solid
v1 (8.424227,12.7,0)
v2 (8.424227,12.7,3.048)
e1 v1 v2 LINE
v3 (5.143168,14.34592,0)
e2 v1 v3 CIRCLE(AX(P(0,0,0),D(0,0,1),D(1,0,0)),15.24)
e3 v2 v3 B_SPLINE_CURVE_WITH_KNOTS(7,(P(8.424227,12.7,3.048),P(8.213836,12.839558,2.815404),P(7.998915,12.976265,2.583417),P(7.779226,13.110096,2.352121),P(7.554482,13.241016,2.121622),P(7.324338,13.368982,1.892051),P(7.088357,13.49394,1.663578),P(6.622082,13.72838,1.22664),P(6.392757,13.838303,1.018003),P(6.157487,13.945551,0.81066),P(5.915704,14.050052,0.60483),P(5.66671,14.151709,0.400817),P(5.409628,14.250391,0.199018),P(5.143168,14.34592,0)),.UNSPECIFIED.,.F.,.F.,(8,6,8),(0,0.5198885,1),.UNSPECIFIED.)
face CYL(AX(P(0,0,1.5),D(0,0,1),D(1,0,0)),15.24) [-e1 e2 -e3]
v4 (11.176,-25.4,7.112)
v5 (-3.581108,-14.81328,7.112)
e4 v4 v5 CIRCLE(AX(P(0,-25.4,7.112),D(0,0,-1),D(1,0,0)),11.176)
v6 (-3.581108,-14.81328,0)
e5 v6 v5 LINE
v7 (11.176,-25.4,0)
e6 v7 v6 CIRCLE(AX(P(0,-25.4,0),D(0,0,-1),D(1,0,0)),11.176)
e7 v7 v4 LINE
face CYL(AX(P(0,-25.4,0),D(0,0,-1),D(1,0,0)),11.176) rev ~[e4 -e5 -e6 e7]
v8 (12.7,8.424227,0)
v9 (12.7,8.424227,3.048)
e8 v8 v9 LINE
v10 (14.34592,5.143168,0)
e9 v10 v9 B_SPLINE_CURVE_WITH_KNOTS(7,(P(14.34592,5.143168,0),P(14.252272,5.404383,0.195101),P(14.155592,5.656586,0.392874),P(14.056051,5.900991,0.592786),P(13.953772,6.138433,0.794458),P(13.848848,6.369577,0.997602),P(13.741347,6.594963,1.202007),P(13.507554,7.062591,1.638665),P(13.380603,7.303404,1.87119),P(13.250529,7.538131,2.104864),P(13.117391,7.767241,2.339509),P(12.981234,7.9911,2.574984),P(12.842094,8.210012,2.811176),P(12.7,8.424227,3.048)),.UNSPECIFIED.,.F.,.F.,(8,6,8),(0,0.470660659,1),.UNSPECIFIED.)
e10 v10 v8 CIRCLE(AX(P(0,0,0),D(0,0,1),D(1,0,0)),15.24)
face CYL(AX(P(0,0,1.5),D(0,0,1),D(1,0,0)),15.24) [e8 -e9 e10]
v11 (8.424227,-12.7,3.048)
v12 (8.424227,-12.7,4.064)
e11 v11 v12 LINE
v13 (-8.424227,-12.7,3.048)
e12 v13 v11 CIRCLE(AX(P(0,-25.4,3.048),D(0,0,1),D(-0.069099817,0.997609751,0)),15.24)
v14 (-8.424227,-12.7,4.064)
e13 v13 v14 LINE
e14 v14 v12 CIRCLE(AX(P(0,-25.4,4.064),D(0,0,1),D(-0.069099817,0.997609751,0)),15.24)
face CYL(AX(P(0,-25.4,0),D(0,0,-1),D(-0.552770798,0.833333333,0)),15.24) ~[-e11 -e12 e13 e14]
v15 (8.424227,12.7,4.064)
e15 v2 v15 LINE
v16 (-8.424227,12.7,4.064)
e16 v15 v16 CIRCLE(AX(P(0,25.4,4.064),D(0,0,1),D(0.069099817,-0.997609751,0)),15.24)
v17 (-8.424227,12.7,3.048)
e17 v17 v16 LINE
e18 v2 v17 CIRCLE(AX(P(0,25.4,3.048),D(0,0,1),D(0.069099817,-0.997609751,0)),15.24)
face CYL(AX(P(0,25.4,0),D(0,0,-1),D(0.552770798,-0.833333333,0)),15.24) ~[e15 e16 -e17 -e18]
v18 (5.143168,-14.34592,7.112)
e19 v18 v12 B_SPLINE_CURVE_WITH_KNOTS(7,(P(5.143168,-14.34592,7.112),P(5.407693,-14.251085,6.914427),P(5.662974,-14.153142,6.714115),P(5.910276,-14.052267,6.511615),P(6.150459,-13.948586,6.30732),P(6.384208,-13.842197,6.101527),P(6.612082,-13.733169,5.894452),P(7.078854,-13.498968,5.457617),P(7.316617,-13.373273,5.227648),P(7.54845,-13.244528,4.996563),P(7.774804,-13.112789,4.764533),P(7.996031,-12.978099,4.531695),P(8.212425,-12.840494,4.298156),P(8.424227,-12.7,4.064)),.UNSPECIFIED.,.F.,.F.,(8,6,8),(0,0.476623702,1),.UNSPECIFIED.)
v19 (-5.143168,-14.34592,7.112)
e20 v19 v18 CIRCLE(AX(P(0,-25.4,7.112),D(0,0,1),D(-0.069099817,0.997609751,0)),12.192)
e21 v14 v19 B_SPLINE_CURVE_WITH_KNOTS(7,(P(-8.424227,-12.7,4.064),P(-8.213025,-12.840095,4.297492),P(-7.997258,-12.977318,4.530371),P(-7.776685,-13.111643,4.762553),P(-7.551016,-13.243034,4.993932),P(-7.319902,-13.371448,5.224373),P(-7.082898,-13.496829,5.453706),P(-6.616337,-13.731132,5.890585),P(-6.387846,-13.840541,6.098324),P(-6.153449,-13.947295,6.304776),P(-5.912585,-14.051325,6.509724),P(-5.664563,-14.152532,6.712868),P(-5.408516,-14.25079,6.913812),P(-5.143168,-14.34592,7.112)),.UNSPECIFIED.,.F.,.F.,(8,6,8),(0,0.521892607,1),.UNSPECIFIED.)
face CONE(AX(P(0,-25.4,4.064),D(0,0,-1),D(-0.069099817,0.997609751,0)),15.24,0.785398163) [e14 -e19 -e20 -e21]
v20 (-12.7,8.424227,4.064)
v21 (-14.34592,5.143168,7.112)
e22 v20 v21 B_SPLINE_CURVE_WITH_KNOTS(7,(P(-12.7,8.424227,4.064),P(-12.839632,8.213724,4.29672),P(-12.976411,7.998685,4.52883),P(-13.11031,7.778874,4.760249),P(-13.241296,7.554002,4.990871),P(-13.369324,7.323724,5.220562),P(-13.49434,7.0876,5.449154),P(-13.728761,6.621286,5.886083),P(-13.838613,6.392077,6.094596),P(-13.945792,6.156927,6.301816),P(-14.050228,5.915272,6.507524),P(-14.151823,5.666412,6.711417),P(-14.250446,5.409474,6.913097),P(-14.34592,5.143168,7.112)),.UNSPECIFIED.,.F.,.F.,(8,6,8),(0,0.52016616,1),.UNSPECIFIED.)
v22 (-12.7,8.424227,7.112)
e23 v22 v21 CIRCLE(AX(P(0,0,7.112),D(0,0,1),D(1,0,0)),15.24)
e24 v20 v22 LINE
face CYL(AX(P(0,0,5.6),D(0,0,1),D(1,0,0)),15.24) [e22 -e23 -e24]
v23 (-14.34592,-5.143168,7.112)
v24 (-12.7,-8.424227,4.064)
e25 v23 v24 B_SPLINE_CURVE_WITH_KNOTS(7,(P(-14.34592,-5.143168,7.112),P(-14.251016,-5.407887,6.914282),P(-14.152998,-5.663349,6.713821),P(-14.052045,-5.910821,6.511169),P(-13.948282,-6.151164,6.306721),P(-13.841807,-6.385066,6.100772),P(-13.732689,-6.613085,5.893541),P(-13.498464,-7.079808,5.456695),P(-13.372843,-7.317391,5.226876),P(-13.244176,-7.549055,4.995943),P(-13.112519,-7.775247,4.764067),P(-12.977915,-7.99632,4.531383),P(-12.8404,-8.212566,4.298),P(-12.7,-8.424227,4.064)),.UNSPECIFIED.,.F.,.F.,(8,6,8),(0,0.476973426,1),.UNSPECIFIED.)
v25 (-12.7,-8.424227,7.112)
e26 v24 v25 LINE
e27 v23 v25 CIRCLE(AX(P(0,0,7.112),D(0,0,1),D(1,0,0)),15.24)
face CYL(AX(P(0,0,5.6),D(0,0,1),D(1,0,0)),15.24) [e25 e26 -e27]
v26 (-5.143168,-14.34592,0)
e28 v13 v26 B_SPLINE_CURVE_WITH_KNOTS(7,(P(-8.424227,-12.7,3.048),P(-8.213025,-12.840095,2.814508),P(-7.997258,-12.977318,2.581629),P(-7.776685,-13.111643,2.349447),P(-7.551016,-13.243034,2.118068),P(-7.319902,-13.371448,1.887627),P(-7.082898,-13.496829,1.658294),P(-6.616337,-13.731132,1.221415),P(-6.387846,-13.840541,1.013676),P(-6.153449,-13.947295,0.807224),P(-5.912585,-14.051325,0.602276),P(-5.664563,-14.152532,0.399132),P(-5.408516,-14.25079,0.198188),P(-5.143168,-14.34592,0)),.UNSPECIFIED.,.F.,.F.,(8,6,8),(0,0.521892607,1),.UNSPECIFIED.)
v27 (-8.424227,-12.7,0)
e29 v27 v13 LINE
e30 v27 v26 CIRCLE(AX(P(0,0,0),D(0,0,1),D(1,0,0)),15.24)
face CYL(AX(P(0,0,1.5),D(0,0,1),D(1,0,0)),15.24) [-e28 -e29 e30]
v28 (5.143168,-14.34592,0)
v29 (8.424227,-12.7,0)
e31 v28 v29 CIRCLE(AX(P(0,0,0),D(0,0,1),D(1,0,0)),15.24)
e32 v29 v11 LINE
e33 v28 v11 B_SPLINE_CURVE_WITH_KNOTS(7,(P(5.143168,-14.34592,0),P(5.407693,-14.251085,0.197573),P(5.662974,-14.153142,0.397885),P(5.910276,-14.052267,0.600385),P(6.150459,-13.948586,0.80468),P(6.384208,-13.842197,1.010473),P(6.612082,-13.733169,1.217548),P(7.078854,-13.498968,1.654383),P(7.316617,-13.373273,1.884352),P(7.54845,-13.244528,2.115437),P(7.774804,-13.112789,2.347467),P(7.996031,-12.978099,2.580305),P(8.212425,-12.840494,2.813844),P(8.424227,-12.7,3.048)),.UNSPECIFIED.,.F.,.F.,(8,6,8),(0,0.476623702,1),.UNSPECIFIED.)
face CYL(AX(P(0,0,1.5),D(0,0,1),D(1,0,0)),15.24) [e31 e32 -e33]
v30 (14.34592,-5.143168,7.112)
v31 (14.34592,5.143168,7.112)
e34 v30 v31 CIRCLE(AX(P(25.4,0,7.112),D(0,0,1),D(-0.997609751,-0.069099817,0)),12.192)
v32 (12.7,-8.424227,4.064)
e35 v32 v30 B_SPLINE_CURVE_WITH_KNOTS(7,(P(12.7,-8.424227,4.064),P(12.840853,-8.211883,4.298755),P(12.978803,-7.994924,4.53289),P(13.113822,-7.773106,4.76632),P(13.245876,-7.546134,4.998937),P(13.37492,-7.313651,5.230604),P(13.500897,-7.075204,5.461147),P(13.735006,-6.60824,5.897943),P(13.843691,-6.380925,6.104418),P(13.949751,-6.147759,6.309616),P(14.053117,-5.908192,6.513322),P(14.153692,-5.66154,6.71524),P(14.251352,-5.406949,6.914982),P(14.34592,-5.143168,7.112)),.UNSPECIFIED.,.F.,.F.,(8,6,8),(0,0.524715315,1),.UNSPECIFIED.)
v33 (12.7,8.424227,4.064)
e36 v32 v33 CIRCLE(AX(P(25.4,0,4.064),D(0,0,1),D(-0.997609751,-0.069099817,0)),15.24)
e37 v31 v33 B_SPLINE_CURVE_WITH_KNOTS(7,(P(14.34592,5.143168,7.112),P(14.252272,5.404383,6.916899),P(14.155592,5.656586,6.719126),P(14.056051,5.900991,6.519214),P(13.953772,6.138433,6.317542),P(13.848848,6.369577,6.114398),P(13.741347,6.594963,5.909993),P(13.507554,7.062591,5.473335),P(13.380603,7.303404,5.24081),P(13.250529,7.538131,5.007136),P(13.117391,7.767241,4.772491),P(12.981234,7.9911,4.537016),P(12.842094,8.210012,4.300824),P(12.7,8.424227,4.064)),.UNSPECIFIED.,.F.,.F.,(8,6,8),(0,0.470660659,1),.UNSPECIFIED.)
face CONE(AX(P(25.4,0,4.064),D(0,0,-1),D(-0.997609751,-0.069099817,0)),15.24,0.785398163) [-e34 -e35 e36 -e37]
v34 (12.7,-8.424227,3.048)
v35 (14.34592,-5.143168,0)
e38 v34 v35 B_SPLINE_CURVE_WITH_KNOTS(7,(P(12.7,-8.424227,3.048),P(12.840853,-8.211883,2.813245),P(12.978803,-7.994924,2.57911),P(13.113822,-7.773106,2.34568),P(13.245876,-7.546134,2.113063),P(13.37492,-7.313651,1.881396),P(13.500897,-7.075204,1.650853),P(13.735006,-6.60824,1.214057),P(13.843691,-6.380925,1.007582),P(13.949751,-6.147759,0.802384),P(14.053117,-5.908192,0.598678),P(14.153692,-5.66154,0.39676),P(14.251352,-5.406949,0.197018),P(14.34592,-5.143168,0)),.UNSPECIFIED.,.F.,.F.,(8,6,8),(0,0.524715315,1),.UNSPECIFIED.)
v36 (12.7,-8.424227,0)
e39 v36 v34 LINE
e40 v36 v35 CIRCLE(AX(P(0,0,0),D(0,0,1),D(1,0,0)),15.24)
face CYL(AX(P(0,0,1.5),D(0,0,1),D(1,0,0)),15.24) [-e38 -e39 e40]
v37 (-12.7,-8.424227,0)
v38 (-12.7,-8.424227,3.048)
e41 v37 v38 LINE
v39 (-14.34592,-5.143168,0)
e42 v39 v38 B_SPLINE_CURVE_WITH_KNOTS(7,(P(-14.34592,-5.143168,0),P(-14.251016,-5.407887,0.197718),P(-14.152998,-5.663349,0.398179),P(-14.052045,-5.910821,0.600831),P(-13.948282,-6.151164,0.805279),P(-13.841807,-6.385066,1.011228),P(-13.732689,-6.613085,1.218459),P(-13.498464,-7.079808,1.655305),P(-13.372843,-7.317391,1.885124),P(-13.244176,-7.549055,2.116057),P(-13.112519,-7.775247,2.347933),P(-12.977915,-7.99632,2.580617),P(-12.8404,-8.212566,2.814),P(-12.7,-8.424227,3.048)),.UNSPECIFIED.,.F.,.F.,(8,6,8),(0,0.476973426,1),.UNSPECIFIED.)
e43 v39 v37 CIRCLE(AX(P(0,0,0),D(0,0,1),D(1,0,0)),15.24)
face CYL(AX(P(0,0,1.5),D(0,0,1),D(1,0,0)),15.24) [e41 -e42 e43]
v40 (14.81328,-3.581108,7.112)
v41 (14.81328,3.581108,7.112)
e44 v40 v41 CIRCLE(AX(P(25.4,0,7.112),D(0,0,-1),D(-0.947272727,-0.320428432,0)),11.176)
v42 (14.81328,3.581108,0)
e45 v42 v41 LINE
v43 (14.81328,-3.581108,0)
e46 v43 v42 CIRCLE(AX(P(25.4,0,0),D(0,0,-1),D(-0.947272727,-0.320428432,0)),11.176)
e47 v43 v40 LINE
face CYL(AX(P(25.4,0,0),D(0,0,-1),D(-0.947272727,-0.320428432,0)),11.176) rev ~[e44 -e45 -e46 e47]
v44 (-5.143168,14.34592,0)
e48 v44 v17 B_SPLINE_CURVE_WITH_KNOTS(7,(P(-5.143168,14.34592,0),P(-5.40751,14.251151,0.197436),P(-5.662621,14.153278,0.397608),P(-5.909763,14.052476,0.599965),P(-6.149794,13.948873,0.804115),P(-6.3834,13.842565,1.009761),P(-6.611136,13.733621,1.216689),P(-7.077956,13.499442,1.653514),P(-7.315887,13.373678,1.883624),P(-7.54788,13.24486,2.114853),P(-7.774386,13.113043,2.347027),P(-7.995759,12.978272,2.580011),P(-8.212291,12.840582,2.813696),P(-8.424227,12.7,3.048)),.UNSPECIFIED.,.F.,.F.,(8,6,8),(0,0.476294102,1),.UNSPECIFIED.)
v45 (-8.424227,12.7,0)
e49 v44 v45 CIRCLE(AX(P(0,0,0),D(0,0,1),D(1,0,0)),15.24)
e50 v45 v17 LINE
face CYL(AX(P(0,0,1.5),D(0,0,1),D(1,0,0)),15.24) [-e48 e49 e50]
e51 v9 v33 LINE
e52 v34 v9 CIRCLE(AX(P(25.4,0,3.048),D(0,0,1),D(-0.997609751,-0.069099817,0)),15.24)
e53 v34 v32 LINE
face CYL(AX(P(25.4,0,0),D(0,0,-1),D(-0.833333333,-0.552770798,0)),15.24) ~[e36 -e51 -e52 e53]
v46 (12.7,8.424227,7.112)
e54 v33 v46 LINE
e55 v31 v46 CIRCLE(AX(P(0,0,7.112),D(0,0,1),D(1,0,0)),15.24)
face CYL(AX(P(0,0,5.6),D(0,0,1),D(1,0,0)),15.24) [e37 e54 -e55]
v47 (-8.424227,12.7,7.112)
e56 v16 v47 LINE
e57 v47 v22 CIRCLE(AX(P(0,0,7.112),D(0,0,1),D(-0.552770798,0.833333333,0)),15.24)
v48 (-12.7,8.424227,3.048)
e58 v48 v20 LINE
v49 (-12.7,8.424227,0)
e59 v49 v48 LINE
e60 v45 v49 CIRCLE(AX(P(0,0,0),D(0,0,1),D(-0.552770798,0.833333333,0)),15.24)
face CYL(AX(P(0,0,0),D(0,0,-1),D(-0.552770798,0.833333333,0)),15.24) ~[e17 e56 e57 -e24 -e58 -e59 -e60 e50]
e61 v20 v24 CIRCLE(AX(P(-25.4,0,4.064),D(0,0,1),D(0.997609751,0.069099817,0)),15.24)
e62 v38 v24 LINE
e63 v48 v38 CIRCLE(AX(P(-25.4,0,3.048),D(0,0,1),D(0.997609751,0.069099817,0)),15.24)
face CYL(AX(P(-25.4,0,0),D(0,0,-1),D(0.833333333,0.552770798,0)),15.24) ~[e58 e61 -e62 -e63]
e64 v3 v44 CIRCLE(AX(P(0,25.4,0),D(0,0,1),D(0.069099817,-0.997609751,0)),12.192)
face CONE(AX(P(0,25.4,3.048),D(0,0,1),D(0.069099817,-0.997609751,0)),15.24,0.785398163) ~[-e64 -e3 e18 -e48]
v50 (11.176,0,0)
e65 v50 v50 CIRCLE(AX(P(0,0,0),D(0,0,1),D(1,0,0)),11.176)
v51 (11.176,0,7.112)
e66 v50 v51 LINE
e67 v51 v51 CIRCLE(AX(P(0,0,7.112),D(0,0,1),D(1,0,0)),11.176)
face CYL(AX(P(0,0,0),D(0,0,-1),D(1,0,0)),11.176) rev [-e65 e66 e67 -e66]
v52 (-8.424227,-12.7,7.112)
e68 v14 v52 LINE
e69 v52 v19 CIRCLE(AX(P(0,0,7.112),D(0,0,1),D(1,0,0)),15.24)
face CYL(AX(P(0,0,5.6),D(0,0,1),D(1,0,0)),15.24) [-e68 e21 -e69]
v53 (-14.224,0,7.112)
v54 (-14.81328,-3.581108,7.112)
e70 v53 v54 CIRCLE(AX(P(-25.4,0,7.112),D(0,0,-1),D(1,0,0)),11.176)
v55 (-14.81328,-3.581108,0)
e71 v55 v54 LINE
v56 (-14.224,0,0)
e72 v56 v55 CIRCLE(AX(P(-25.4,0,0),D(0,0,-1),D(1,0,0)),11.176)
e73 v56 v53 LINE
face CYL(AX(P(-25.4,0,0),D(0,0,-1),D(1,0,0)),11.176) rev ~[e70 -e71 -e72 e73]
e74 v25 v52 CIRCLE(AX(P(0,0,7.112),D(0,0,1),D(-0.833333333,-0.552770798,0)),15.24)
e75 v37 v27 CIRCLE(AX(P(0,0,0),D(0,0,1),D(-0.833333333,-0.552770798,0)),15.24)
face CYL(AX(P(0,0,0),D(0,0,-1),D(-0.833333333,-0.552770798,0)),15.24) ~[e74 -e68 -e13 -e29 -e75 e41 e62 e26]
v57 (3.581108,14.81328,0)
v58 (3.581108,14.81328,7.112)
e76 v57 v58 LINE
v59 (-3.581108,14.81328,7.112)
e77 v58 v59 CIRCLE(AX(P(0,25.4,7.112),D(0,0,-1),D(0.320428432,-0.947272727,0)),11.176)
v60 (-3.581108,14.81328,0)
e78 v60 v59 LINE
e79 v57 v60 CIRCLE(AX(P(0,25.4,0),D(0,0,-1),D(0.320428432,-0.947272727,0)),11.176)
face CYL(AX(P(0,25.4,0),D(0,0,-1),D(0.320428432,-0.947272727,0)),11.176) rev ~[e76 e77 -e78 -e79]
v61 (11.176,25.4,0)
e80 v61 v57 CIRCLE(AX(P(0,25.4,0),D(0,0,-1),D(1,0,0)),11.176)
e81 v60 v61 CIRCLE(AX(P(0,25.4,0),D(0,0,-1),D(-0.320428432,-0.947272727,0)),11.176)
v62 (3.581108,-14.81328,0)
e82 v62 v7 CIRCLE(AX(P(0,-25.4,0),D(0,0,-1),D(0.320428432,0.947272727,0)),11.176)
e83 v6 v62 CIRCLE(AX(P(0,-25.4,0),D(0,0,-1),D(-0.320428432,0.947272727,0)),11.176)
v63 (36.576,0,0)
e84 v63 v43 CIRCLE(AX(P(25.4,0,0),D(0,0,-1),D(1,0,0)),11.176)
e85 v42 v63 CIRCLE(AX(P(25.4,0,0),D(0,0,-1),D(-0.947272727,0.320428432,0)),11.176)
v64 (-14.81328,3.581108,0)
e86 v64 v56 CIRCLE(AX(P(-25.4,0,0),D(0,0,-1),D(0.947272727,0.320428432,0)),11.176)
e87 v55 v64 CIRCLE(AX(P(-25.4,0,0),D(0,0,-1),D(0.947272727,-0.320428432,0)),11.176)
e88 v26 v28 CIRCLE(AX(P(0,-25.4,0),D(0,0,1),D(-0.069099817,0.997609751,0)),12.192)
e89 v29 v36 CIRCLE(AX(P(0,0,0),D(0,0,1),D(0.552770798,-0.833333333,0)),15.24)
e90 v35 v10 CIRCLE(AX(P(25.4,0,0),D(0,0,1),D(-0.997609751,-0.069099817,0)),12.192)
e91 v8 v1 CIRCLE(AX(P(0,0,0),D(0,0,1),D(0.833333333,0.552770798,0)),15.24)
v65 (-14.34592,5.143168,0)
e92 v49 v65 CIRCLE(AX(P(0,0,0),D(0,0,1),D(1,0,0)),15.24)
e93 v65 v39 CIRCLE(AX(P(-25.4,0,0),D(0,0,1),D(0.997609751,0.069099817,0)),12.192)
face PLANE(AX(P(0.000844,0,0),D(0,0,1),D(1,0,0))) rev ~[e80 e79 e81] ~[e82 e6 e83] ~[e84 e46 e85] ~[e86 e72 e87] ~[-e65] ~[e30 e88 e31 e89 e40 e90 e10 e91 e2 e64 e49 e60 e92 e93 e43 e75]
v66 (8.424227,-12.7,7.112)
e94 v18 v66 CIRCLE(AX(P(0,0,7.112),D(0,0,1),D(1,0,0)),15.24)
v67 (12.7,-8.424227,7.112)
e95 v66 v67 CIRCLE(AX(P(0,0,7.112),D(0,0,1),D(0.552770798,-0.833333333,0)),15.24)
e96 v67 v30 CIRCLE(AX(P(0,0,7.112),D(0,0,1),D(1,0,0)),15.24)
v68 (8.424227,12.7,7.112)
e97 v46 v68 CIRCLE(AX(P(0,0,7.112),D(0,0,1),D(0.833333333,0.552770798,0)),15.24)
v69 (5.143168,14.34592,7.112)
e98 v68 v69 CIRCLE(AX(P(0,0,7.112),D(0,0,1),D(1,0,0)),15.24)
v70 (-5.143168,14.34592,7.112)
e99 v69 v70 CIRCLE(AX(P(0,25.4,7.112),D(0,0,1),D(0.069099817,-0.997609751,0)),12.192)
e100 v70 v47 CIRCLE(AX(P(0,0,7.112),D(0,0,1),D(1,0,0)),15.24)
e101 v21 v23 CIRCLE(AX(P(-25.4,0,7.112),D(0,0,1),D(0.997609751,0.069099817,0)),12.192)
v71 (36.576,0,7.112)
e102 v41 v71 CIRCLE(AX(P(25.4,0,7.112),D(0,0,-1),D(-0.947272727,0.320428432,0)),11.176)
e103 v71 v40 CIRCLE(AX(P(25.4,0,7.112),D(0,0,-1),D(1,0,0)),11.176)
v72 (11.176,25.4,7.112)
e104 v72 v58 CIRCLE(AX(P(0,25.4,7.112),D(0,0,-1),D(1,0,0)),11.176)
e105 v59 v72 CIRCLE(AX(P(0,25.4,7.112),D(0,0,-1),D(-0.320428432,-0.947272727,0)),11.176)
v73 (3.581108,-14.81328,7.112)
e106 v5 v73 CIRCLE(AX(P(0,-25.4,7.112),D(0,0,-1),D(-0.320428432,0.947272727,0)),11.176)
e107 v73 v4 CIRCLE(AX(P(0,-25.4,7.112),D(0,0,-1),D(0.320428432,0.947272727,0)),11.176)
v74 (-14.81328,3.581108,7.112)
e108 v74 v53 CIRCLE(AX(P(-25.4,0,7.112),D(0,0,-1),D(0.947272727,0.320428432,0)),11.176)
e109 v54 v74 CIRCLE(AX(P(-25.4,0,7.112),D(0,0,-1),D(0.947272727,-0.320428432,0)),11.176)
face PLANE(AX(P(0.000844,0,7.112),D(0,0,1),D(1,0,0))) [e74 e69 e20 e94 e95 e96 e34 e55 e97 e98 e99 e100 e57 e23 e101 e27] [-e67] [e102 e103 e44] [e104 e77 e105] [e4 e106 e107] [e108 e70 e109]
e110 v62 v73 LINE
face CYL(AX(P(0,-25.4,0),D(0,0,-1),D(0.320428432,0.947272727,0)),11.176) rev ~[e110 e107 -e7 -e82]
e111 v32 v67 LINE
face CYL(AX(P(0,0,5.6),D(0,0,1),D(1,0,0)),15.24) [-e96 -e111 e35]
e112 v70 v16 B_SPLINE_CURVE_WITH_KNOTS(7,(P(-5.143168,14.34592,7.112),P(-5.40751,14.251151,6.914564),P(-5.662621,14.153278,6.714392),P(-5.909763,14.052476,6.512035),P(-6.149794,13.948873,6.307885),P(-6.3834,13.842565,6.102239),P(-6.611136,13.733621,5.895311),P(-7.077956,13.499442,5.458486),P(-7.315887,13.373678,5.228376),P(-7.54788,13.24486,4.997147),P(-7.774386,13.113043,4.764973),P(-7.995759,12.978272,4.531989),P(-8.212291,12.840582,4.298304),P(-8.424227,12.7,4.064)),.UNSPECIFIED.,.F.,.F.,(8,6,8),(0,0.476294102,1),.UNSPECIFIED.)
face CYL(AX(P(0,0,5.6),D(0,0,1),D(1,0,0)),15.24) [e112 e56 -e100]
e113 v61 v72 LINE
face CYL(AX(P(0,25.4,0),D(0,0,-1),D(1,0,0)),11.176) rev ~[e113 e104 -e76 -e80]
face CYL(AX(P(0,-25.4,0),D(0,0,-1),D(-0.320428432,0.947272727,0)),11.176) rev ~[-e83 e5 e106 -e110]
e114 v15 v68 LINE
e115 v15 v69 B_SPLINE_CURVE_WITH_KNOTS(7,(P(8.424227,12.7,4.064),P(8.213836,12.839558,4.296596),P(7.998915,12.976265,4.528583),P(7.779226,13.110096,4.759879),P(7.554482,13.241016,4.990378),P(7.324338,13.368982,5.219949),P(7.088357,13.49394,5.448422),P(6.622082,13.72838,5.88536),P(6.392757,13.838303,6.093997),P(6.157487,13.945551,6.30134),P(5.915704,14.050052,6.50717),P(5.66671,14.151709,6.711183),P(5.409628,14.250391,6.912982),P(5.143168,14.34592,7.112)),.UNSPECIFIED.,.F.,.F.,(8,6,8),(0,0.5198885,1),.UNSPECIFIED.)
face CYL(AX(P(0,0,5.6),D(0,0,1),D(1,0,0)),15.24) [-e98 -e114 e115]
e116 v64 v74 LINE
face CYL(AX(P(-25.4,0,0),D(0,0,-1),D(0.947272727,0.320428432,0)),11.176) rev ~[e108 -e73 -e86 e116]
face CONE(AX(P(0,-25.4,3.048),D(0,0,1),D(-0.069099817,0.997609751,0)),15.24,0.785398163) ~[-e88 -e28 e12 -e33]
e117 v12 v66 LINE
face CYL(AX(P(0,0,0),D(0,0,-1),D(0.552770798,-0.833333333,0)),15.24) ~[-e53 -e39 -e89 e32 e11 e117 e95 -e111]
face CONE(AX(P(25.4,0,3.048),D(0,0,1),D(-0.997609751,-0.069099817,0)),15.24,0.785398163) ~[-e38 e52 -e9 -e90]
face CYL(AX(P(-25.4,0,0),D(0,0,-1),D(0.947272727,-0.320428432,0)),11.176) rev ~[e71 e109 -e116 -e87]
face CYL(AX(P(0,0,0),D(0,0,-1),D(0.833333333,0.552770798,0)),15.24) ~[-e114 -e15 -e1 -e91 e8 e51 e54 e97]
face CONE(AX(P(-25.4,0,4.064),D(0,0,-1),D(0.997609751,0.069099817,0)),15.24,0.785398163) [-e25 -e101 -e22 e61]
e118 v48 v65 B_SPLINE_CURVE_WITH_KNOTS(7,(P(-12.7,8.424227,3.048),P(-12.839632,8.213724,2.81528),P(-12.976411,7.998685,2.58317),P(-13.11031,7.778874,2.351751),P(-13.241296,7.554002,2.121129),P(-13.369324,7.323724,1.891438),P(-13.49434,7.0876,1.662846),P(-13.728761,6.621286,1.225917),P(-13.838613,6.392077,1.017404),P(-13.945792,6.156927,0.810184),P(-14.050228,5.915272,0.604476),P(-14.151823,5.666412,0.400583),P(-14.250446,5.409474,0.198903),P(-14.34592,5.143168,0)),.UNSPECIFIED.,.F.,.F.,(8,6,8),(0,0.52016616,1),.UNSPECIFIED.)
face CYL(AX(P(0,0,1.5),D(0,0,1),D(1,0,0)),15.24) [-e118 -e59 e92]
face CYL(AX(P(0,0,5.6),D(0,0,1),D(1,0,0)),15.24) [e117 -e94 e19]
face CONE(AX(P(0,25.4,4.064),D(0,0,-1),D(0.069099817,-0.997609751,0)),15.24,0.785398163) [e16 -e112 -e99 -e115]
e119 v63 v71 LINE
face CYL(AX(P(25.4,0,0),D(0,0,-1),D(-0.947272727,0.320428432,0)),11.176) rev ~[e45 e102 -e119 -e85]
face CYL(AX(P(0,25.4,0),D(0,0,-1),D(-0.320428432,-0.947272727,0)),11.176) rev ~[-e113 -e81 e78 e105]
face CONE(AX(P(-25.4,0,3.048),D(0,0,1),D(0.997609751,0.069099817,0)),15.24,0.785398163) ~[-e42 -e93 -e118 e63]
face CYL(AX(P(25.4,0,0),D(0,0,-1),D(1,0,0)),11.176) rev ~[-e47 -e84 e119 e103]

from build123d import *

# Parameters (mm, degrees)
F0_R         = 11.176
F1_DEPTH     = 7.112
F2_T4_ANGLE  = 352.0754293858
F2_S5_R      = 15.24
F2_T6_DEPTH  = 23
F2_T10_ANGLE = 352.0754293858
F2_S11_R     = 15.24
F2_T12_DEPTH = 23
F2_T16_ANGLE = 352.0754293858
F2_S17_R     = 15.24
F2_T18_DEPTH = 23
F2_T22_ANGLE = 352.0754293858
F2_S23_R     = 15.24
F2_T24_DEPTH = 23
F2_T28_ANGLE = 352.0754293858
F2_S29_R     = 15.24
F2_T30_DEPTH = 23
F2_T34_ANGLE = 352.0754293858
F2_S35_R     = 15.24
F2_T36_DEPTH = 23
F2_T40_ANGLE = 352.0754293858
F2_S41_R     = 15.24
F2_T42_DEPTH = 23
F2_T46_ANGLE = 352.0754293858
F2_S47_R     = 15.24
F2_T48_DEPTH = 23


# Not quite as in the source:
# - a fillet or chamfer that OpenCascade refuses, or shapes differently, is made with other operations: its cross-section is extruded or revolved along the edge and cut away or added


with BuildPart() as f1:
    # F0 (on Top) → F1 (new body)
    with BuildSketch(Plane.XY):
        with BuildLine():
            ThreePointArc((-14.224, 0), (-14.3723039868, -1.8146340237), (-14.81328, -3.5811081583))
            ThreePointArc((-14.81328, -3.5811081583), (-13.9681456908, -6.0949574207), (-12.7, -8.4242269675))
            ThreePointArc((-12.7, -8.4242269675), (-10.7763073453, -10.7763073453), (-8.4242269675, -12.7))
            ThreePointArc((-8.4242269675, -12.7), (-6.0949574207, -13.9681456908), (-3.5811081583, -14.81328))
            ThreePointArc((-3.5811081583, -14.81328), (0, -14.224), (3.5811081583, -14.81328))
            ThreePointArc((3.5811081583, -14.81328), (6.0949574207, -13.9681456908), (8.4242269675, -12.7))
            ThreePointArc((8.4242269675, -12.7), (10.7763073453, -10.7763073453), (12.7, -8.4242269675))
            ThreePointArc((12.7, -8.4242269675), (13.9681456908, -6.0949574207), (14.81328, -3.5811081583))
            ThreePointArc((14.81328, -3.5811081583), (14.224, 0), (14.81328, 3.5811081583))
            ThreePointArc((14.81328, 3.5811081583), (13.9681456908, 6.0949574207), (12.7, 8.4242269675))
            ThreePointArc((12.7, 8.4242269675), (10.7763073453, 10.7763073453), (8.4242269675, 12.7))
            ThreePointArc((8.4242269675, 12.7), (6.0949574207, 13.9681456908), (3.5811081583, 14.81328))
            ThreePointArc((3.5811081583, 14.81328), (0, 14.224), (-3.5811081583, 14.81328))
            ThreePointArc((-3.5811081583, 14.81328), (-6.0949574207, 13.9681456908), (-8.4242269675, 12.7))
            ThreePointArc((-8.4242269675, 12.7), (-10.7763073453, 10.7763073453), (-12.7, 8.4242269675))
            ThreePointArc((-12.7, 8.4242269675), (-13.9681456908, 6.0949574207), (-14.81328, 3.5811081583))
            ThreePointArc((-14.81328, 3.5811081583), (-14.3723039868, 1.8146340237), (-14.224, 0))
        make_face()
        Circle(F0_R, mode=Mode.SUBTRACT)
        with BuildLine():
            ThreePointArc((-12.7, -8.4242269675), (-13.9681456908, -6.0949574207), (-14.81328, -3.5811081583))
            ThreePointArc((-14.81328, -3.5811081583), (-36.576, 0), (-14.81328, 3.5811081583))
            ThreePointArc((-14.81328, 3.5811081583), (-13.9681456908, 6.0949574207), (-12.7, 8.4242269675))
            ThreePointArc((-12.7, 8.4242269675), (-40.64, 0), (-12.7, -8.4242269675))
        make_face()
        with BuildLine():
            ThreePointArc((-3.5811081583, -14.81328), (-6.0949574207, -13.9681456908), (-8.4242269675, -12.7))
            ThreePointArc((-8.4242269675, -12.7), (0, -40.64), (8.4242269675, -12.7))
            ThreePointArc((8.4242269675, -12.7), (6.0949574207, -13.9681456908), (3.5811081583, -14.81328))
            ThreePointArc((3.5811081583, -14.81328), (9.0808986553, -18.8853813917), (11.176, -25.4))
            ThreePointArc((11.176, -25.4), (-6.5146186083, -34.4808986553), (-3.5811081583, -14.81328))
        make_face()
        with BuildLine():
            ThreePointArc((8.4242269675, 12.7), (0, 40.64), (-8.4242269675, 12.7))
            ThreePointArc((-8.4242269675, 12.7), (-6.0949574207, 13.9681456908), (-3.5811081583, 14.81328))
            ThreePointArc((-3.5811081583, 14.81328), (-6.5146186083, 34.4808986553), (11.176, 25.4))
            ThreePointArc((11.176, 25.4), (9.0808986553, 18.8853813917), (3.5811081583, 14.81328))
            ThreePointArc((3.5811081583, 14.81328), (6.0949574207, 13.9681456908), (8.4242269675, 12.7))
        make_face()
        with BuildLine():
            ThreePointArc((14.81328, -3.5811081583), (13.9681456908, -6.0949574207), (12.7, -8.4242269675))
            ThreePointArc((12.7, -8.4242269675), (40.64, 0), (12.7, 8.4242269675))
            ThreePointArc((12.7, 8.4242269675), (13.9681456908, 6.0949574207), (14.81328, 3.5811081583))
            ThreePointArc((14.81328, 3.5811081583), (27.2146340237, 11.0276960132), (36.576, 0))
            ThreePointArc((36.576, 0), (27.2146340237, -11.0276960132), (14.81328, -3.5811081583))
        make_face()
    extrude(amount=F1_DEPTH)

    # F2: chamfer of 3.048 on 8 edges, made by hand


with BuildPart() as f2_tool2:
    # F2_s3 → F2_t4 (revolve)
    with BuildSketch(Plane(origin=(1.7509401303, 0.1212795301, 0), x_dir=(0, 0, 1), z_dir=(-0.997609751, -0.0690998166, 0))):
        Polygon((4.064, 10.0992876762), (7.112, 13.1472876762), (7.112, 10.0992876762), align=None)
    revolve(axis=Axis((0, 25.4, 7.112), (0, 0, 1)), revolution_arc=F2_T4_ANGLE)

    # F2_s5 → F2_t6 (cut, symmetric)
    with BuildSketch(Plane.XY.offset(5.6)):
        Circle(F2_S5_R)
    extrude(amount=F2_T6_DEPTH, both=True, mode=Mode.SUBTRACT)


with BuildPart() as f1_1:
    add(f1.part)

    # F2_t1: cut F2_tool2
    add(f2_tool2.part, mode=Mode.SUBTRACT)


with BuildPart() as f2_tool8:
    # F2_s9 → F2_t10 (revolve)
    with BuildSketch(Plane(origin=(1.7509401303, 0.1212795301, 0), x_dir=(0, 0, 1), z_dir=(-0.997609751, -0.0690998166, 0))):
        Polygon((3.048, 10.0992876762), (0, 13.1472876762), (0, 10.0992876762), align=None)
    revolve(axis=Axis((0, 25.4, 0), (0, 0, 1)), revolution_arc=F2_T10_ANGLE)

    # F2_s11 → F2_t12 (cut, symmetric)
    with BuildSketch(Plane.XY.offset(1.5)):
        Circle(F2_S11_R)
    extrude(amount=F2_T12_DEPTH, both=True, mode=Mode.SUBTRACT)


with BuildPart() as f1_2:
    add(f1_1.part)

    # F2_t7: cut F2_tool8
    add(f2_tool8.part, mode=Mode.SUBTRACT)


with BuildPart() as f2_tool14:
    # F2_s15 → F2_t16 (revolve)
    with BuildSketch(Plane(origin=(0.1212795301, -1.7509401303, 0), x_dir=(0, 0, 1), z_dir=(-0.0690998166, 0.997609751, 0))):
        Polygon((4.064, 10.0992876762), (7.112, 13.1472876762), (7.112, 10.0992876762), align=None)
    revolve(axis=Axis((25.4, 0, 7.112), (0, 0, 1)), revolution_arc=F2_T16_ANGLE)

    # F2_s17 → F2_t18 (cut, symmetric)
    with BuildSketch(Plane.XY.offset(5.6)):
        Circle(F2_S17_R)
    extrude(amount=F2_T18_DEPTH, both=True, mode=Mode.SUBTRACT)


with BuildPart() as f1_3:
    add(f1_2.part)

    # F2_t13: cut F2_tool14
    add(f2_tool14.part, mode=Mode.SUBTRACT)


with BuildPart() as f2_tool20:
    # F2_s21 → F2_t22 (revolve)
    with BuildSketch(Plane(origin=(0.1212795301, -1.7509401303, 0), x_dir=(0, 0, 1), z_dir=(-0.0690998166, 0.997609751, 0))):
        Polygon((3.048, 10.0992876762), (0, 13.1472876762), (0, 10.0992876762), align=None)
    revolve(axis=Axis((25.4, 0, 0), (0, 0, 1)), revolution_arc=F2_T22_ANGLE)

    # F2_s23 → F2_t24 (cut, symmetric)
    with BuildSketch(Plane.XY.offset(1.5)):
        Circle(F2_S23_R)
    extrude(amount=F2_T24_DEPTH, both=True, mode=Mode.SUBTRACT)


with BuildPart() as f1_4:
    add(f1_3.part)

    # F2_t19: cut F2_tool20
    add(f2_tool20.part, mode=Mode.SUBTRACT)


with BuildPart() as f2_tool26:
    # F2_s27 → F2_t28 (revolve)
    with BuildSketch(Plane(origin=(-1.7509401303, -0.1212795301, 0), x_dir=(0, 0, 1), z_dir=(0.997609751, 0.0690998166, 0))):
        Polygon((4.064, 10.0992876762), (7.112, 13.1472876762), (7.112, 10.0992876762), align=None)
    revolve(axis=Axis((0, -25.4, 7.112), (0, 0, 1)), revolution_arc=F2_T28_ANGLE)

    # F2_s29 → F2_t30 (cut, symmetric)
    with BuildSketch(Plane.XY.offset(5.6)):
        Circle(F2_S29_R)
    extrude(amount=F2_T30_DEPTH, both=True, mode=Mode.SUBTRACT)


with BuildPart() as f1_5:
    add(f1_4.part)

    # F2_t25: cut F2_tool26
    add(f2_tool26.part, mode=Mode.SUBTRACT)


with BuildPart() as f2_tool32:
    # F2_s33 → F2_t34 (revolve)
    with BuildSketch(Plane(origin=(-1.7509401303, -0.1212795301, 0), x_dir=(0, 0, 1), z_dir=(0.997609751, 0.0690998166, 0))):
        Polygon((3.048, 10.0992876762), (0, 13.1472876762), (0, 10.0992876762), align=None)
    revolve(axis=Axis((0, -25.4, 0), (0, 0, 1)), revolution_arc=F2_T34_ANGLE)

    # F2_s35 → F2_t36 (cut, symmetric)
    with BuildSketch(Plane.XY.offset(1.5)):
        Circle(F2_S35_R)
    extrude(amount=F2_T36_DEPTH, both=True, mode=Mode.SUBTRACT)


with BuildPart() as f1_6:
    add(f1_5.part)

    # F2_t31: cut F2_tool32
    add(f2_tool32.part, mode=Mode.SUBTRACT)


with BuildPart() as f2_tool38:
    # F2_s39 → F2_t40 (revolve)
    with BuildSketch(Plane(origin=(-0.1212795301, 1.7509401303, 0), x_dir=(0, 0, 1), z_dir=(0.0690998166, -0.997609751, 0))):
        Polygon((4.064, 10.0992876762), (7.112, 13.1472876762), (7.112, 10.0992876762), align=None)
    revolve(axis=Axis((-25.4, 0, 7.112), (0, 0, 1)), revolution_arc=F2_T40_ANGLE)

    # F2_s41 → F2_t42 (cut, symmetric)
    with BuildSketch(Plane.XY.offset(5.6)):
        Circle(F2_S41_R)
    extrude(amount=F2_T42_DEPTH, both=True, mode=Mode.SUBTRACT)


with BuildPart() as f1_7:
    add(f1_6.part)

    # F2_t37: cut F2_tool38
    add(f2_tool38.part, mode=Mode.SUBTRACT)


with BuildPart() as f2_tool44:
    # F2_s45 → F2_t46 (revolve)
    with BuildSketch(Plane(origin=(-0.1212795301, 1.7509401303, 0), x_dir=(0, 0, 1), z_dir=(0.0690998166, -0.997609751, 0))):
        Polygon((3.048, 10.0992876762), (0, 13.1472876762), (0, 10.0992876762), align=None)
    revolve(axis=Axis((-25.4, 0, 0), (0, 0, 1)), revolution_arc=F2_T46_ANGLE)

    # F2_s47 → F2_t48 (cut, symmetric)
    with BuildSketch(Plane.XY.offset(1.5)):
        Circle(F2_S47_R)
    extrude(amount=F2_T48_DEPTH, both=True, mode=Mode.SUBTRACT)


with BuildPart() as f1_8:
    add(f1_7.part)

    # F2_t43: cut F2_tool44
    add(f2_tool44.part, mode=Mode.SUBTRACT)


solid = f1_8.part
